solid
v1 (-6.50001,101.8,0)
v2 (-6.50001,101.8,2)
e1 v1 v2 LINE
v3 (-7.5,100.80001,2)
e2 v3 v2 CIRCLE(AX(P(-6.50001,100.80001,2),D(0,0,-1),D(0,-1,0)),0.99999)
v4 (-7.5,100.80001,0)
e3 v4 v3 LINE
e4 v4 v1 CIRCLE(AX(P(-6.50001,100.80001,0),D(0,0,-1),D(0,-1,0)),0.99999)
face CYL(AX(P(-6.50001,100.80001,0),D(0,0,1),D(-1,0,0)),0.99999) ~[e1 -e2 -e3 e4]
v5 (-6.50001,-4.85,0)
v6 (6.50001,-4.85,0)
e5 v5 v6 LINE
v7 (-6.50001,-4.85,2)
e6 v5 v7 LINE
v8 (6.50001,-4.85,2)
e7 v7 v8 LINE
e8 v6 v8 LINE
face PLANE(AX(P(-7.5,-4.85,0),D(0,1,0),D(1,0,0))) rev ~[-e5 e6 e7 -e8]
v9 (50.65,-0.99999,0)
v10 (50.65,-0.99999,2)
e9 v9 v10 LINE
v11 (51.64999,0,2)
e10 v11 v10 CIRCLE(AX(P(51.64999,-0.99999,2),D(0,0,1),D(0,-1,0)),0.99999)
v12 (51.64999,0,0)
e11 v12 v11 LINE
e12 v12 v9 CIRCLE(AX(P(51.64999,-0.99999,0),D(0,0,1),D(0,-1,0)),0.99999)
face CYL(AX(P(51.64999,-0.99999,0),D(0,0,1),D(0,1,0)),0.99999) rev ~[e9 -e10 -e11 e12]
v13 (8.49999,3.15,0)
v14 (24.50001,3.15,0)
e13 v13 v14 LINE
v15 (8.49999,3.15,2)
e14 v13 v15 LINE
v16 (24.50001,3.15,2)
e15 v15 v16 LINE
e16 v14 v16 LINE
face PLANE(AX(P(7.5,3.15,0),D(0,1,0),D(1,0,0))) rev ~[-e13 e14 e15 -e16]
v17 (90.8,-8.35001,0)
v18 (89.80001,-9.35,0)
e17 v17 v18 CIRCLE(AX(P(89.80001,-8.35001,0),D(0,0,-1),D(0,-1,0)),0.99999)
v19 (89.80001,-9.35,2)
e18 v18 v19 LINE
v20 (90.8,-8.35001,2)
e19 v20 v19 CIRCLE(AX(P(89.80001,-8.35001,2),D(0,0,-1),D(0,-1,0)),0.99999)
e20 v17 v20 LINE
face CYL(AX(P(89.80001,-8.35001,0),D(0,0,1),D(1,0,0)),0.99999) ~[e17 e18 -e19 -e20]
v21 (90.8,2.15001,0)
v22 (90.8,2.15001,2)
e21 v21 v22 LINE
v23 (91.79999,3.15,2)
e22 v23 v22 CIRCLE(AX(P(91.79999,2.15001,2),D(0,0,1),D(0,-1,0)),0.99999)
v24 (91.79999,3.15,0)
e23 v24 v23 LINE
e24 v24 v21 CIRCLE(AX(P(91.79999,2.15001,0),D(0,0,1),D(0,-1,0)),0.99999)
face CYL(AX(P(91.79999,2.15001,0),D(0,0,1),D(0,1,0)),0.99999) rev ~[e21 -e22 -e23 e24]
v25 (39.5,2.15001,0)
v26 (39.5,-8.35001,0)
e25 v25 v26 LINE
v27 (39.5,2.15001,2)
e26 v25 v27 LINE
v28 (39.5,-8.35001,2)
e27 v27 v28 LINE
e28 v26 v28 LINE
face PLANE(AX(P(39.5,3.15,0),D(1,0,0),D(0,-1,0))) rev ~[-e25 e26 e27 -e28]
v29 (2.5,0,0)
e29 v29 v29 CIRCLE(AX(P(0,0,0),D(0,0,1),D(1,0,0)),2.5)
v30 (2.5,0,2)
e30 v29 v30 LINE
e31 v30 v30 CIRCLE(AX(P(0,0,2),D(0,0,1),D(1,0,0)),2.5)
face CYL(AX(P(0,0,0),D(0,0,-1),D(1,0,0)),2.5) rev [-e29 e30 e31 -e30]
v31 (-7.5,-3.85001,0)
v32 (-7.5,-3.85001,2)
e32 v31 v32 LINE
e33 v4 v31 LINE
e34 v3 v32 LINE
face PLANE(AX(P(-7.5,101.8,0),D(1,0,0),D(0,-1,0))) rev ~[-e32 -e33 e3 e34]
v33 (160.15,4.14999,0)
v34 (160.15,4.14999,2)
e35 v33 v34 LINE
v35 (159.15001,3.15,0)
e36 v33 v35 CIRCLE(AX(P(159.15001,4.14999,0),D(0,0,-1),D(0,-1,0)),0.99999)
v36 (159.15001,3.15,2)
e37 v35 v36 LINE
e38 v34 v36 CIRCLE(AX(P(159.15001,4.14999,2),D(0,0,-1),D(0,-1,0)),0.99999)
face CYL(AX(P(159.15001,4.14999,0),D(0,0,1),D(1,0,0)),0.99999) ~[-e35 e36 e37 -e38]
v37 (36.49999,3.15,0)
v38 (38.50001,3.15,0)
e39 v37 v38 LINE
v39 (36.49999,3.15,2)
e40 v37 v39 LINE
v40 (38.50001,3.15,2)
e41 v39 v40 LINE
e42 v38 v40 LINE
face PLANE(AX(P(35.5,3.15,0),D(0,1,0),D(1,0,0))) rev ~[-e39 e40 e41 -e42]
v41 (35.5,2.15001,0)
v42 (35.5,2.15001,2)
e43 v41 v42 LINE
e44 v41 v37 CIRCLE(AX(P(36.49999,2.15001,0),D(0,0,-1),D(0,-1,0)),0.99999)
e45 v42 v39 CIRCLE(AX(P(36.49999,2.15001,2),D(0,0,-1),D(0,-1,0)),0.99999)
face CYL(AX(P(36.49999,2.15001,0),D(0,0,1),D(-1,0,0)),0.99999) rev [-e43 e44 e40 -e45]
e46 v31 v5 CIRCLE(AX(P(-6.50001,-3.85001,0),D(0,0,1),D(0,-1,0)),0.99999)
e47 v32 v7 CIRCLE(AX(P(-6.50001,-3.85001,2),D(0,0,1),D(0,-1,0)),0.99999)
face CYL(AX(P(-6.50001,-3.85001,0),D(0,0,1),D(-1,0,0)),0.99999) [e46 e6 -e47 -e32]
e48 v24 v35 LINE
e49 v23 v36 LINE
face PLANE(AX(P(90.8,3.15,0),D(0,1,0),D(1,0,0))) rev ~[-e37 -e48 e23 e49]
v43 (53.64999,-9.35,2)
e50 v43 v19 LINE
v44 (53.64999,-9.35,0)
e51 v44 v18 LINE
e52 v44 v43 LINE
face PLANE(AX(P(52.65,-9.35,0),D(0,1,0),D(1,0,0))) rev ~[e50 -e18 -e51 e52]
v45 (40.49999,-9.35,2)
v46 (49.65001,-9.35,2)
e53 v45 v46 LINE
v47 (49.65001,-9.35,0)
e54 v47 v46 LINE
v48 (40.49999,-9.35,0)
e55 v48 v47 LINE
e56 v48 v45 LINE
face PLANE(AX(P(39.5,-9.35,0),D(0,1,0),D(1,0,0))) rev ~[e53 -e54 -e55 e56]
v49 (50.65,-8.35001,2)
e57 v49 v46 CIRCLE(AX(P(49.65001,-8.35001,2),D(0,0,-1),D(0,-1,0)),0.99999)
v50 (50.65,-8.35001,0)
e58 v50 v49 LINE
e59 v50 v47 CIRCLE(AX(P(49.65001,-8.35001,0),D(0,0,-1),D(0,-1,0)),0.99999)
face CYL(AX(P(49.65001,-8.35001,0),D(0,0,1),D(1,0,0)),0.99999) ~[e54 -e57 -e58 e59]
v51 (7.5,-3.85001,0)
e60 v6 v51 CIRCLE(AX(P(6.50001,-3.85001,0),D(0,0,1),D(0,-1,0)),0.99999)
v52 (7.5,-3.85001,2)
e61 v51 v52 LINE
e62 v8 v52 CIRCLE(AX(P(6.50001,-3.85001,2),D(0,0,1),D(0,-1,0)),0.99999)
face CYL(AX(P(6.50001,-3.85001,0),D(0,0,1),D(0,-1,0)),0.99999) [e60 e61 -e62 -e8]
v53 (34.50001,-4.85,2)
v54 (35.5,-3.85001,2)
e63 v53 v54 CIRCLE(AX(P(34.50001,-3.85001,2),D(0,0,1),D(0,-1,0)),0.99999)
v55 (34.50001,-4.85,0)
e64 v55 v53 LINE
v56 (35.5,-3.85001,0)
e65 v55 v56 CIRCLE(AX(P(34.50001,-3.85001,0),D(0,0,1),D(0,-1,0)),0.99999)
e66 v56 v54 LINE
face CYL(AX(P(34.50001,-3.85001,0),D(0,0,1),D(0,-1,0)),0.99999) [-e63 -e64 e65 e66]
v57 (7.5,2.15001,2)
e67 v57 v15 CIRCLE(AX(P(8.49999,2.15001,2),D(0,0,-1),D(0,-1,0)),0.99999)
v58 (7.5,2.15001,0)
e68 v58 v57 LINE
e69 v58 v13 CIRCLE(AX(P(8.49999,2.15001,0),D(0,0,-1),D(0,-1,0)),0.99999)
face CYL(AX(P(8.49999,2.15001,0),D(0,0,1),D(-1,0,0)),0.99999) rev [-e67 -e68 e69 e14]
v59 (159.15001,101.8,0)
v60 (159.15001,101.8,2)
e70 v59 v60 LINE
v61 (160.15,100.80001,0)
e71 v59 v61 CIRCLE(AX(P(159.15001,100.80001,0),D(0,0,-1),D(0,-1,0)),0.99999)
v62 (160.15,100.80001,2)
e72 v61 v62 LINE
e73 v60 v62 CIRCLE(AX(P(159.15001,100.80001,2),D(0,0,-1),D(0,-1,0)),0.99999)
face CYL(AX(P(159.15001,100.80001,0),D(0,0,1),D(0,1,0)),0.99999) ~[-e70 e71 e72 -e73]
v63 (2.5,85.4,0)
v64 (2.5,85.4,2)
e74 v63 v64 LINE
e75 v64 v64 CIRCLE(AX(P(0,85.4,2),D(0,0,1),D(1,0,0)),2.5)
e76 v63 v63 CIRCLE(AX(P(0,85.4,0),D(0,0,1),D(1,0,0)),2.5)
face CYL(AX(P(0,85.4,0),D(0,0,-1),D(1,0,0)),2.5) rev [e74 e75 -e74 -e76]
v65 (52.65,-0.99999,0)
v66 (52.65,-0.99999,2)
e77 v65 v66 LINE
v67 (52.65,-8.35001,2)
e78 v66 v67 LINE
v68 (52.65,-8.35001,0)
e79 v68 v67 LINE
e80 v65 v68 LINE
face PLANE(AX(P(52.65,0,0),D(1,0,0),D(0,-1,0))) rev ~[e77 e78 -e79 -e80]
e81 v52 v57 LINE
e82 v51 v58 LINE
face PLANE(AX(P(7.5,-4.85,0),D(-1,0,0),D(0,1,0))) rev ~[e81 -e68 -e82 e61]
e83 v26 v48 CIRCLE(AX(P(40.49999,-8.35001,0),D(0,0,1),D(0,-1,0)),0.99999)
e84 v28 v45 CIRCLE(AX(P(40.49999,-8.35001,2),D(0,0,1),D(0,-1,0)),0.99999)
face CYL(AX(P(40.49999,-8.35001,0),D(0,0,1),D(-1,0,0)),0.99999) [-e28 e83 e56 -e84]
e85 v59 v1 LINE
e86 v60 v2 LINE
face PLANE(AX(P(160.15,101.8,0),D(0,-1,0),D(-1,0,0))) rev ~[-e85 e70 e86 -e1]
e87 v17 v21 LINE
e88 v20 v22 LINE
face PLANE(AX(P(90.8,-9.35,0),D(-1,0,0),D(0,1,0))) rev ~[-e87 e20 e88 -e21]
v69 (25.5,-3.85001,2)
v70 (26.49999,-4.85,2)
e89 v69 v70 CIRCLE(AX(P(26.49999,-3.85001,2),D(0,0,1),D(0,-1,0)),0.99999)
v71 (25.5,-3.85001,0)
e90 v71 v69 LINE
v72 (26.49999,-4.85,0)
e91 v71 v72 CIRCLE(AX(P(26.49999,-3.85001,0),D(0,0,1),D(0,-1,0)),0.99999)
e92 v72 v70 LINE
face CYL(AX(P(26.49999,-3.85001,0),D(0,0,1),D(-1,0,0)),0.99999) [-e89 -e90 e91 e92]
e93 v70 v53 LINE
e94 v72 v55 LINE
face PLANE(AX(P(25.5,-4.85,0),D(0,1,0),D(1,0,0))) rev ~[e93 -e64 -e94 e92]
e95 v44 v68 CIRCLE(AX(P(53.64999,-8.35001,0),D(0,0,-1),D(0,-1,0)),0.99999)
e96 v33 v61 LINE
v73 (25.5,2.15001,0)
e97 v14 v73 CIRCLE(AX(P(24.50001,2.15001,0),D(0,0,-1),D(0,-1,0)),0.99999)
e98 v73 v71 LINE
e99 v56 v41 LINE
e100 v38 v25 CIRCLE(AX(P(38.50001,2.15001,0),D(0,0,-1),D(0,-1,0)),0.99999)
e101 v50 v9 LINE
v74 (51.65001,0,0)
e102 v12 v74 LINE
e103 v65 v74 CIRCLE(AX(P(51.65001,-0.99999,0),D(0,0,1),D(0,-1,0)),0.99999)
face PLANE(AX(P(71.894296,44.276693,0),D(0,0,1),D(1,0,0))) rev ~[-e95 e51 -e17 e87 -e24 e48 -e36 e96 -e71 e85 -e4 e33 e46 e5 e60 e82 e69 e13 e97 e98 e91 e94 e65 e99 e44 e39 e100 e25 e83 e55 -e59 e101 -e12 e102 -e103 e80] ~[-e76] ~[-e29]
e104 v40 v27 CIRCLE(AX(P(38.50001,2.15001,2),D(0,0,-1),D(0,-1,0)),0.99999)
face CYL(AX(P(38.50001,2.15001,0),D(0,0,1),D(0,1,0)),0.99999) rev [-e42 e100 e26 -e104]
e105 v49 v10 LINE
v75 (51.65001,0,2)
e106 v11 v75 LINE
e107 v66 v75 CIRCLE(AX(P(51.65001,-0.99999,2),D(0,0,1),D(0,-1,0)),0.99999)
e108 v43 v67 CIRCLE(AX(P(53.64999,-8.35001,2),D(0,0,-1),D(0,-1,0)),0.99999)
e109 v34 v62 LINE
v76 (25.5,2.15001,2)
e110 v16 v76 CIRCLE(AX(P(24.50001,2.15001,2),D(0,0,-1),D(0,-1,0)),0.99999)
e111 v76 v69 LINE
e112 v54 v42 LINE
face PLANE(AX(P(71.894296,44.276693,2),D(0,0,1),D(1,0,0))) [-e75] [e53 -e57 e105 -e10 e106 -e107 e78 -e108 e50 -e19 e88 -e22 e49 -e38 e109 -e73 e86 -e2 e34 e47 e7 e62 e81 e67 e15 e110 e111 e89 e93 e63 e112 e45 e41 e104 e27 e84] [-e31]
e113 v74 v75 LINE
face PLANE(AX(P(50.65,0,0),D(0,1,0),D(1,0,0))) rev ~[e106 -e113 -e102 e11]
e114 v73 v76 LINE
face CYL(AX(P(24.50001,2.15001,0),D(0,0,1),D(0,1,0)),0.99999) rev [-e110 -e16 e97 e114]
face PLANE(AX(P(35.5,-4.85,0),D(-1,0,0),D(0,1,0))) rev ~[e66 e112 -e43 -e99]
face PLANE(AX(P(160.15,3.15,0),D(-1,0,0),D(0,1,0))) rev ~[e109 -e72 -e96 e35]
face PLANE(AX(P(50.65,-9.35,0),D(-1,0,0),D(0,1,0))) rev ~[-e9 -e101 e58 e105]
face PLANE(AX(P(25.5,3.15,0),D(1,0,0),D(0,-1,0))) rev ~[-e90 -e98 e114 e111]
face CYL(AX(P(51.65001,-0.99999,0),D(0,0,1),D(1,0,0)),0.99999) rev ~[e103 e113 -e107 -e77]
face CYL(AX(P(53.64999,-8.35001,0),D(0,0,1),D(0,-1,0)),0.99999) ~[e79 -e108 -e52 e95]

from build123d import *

# Parameters (mm, degrees)
F0_R     = 2.5
F1_DEPTH = 2
F2_R     = 0.99999


# Not quite as in the source:
# - a fillet or chamfer is up to 0.001 mm smaller than in the source, because OpenCascade refuses the exact size


with BuildPart() as f1:
    # F0 (on Top) → F1 (new body)
    with BuildSketch(Plane.XY):
        Polygon((-7.5, 101.8), (-7.5, -4.85), (7.5, -4.85), (7.5, 3.15), (25.5, 3.15), (25.5, -4.85), (35.5, -4.85), (35.5, 3.15), (39.5, 3.15), (39.5, -9.35), (50.65, -9.35), (50.65, 0), (52.65, 0), (52.65, -9.35), (90.8, -9.35), (90.8, 3.15), (160.15, 3.15), (160.15, 101.8), align=None)
        Circle(F0_R, mode=Mode.SUBTRACT)
        with Locations((0, 85.4)):
            Circle(F0_R, mode=Mode.SUBTRACT)
    extrude(amount=F1_DEPTH)

    # F2 (radius 1 in the source; OpenCascade refuses exactly that, so slightly less here)
    f2_edges = [f1.edges().sort_by_distance(p)[0] for p in [
        (-7.5, -4.85, 1),
        (7.5, -4.85, 1),
        (25.5, 3.15, 1),
        (25.5, -4.85, 1),
        (35.5, -4.85, 1),
        (39.5, 3.15, 1),
        (39.5, -9.35, 1),
        (50.65, -9.35, 1),
        (52.65, 0, 1),
        (52.65, -9.35, 1),
        (90.8, -9.35, 1),
        (-7.5, 101.8, 1),
        (160.15, 101.8, 1),
        (160.15, 3.15, 1),
        (90.8, 3.15, 1),
        (35.5, 3.15, 1),
        (7.5, 3.15, 1),
        (50.65, 0, 1),
    ]]
    fillet(f2_edges, radius=F2_R)


solid = f1.part
